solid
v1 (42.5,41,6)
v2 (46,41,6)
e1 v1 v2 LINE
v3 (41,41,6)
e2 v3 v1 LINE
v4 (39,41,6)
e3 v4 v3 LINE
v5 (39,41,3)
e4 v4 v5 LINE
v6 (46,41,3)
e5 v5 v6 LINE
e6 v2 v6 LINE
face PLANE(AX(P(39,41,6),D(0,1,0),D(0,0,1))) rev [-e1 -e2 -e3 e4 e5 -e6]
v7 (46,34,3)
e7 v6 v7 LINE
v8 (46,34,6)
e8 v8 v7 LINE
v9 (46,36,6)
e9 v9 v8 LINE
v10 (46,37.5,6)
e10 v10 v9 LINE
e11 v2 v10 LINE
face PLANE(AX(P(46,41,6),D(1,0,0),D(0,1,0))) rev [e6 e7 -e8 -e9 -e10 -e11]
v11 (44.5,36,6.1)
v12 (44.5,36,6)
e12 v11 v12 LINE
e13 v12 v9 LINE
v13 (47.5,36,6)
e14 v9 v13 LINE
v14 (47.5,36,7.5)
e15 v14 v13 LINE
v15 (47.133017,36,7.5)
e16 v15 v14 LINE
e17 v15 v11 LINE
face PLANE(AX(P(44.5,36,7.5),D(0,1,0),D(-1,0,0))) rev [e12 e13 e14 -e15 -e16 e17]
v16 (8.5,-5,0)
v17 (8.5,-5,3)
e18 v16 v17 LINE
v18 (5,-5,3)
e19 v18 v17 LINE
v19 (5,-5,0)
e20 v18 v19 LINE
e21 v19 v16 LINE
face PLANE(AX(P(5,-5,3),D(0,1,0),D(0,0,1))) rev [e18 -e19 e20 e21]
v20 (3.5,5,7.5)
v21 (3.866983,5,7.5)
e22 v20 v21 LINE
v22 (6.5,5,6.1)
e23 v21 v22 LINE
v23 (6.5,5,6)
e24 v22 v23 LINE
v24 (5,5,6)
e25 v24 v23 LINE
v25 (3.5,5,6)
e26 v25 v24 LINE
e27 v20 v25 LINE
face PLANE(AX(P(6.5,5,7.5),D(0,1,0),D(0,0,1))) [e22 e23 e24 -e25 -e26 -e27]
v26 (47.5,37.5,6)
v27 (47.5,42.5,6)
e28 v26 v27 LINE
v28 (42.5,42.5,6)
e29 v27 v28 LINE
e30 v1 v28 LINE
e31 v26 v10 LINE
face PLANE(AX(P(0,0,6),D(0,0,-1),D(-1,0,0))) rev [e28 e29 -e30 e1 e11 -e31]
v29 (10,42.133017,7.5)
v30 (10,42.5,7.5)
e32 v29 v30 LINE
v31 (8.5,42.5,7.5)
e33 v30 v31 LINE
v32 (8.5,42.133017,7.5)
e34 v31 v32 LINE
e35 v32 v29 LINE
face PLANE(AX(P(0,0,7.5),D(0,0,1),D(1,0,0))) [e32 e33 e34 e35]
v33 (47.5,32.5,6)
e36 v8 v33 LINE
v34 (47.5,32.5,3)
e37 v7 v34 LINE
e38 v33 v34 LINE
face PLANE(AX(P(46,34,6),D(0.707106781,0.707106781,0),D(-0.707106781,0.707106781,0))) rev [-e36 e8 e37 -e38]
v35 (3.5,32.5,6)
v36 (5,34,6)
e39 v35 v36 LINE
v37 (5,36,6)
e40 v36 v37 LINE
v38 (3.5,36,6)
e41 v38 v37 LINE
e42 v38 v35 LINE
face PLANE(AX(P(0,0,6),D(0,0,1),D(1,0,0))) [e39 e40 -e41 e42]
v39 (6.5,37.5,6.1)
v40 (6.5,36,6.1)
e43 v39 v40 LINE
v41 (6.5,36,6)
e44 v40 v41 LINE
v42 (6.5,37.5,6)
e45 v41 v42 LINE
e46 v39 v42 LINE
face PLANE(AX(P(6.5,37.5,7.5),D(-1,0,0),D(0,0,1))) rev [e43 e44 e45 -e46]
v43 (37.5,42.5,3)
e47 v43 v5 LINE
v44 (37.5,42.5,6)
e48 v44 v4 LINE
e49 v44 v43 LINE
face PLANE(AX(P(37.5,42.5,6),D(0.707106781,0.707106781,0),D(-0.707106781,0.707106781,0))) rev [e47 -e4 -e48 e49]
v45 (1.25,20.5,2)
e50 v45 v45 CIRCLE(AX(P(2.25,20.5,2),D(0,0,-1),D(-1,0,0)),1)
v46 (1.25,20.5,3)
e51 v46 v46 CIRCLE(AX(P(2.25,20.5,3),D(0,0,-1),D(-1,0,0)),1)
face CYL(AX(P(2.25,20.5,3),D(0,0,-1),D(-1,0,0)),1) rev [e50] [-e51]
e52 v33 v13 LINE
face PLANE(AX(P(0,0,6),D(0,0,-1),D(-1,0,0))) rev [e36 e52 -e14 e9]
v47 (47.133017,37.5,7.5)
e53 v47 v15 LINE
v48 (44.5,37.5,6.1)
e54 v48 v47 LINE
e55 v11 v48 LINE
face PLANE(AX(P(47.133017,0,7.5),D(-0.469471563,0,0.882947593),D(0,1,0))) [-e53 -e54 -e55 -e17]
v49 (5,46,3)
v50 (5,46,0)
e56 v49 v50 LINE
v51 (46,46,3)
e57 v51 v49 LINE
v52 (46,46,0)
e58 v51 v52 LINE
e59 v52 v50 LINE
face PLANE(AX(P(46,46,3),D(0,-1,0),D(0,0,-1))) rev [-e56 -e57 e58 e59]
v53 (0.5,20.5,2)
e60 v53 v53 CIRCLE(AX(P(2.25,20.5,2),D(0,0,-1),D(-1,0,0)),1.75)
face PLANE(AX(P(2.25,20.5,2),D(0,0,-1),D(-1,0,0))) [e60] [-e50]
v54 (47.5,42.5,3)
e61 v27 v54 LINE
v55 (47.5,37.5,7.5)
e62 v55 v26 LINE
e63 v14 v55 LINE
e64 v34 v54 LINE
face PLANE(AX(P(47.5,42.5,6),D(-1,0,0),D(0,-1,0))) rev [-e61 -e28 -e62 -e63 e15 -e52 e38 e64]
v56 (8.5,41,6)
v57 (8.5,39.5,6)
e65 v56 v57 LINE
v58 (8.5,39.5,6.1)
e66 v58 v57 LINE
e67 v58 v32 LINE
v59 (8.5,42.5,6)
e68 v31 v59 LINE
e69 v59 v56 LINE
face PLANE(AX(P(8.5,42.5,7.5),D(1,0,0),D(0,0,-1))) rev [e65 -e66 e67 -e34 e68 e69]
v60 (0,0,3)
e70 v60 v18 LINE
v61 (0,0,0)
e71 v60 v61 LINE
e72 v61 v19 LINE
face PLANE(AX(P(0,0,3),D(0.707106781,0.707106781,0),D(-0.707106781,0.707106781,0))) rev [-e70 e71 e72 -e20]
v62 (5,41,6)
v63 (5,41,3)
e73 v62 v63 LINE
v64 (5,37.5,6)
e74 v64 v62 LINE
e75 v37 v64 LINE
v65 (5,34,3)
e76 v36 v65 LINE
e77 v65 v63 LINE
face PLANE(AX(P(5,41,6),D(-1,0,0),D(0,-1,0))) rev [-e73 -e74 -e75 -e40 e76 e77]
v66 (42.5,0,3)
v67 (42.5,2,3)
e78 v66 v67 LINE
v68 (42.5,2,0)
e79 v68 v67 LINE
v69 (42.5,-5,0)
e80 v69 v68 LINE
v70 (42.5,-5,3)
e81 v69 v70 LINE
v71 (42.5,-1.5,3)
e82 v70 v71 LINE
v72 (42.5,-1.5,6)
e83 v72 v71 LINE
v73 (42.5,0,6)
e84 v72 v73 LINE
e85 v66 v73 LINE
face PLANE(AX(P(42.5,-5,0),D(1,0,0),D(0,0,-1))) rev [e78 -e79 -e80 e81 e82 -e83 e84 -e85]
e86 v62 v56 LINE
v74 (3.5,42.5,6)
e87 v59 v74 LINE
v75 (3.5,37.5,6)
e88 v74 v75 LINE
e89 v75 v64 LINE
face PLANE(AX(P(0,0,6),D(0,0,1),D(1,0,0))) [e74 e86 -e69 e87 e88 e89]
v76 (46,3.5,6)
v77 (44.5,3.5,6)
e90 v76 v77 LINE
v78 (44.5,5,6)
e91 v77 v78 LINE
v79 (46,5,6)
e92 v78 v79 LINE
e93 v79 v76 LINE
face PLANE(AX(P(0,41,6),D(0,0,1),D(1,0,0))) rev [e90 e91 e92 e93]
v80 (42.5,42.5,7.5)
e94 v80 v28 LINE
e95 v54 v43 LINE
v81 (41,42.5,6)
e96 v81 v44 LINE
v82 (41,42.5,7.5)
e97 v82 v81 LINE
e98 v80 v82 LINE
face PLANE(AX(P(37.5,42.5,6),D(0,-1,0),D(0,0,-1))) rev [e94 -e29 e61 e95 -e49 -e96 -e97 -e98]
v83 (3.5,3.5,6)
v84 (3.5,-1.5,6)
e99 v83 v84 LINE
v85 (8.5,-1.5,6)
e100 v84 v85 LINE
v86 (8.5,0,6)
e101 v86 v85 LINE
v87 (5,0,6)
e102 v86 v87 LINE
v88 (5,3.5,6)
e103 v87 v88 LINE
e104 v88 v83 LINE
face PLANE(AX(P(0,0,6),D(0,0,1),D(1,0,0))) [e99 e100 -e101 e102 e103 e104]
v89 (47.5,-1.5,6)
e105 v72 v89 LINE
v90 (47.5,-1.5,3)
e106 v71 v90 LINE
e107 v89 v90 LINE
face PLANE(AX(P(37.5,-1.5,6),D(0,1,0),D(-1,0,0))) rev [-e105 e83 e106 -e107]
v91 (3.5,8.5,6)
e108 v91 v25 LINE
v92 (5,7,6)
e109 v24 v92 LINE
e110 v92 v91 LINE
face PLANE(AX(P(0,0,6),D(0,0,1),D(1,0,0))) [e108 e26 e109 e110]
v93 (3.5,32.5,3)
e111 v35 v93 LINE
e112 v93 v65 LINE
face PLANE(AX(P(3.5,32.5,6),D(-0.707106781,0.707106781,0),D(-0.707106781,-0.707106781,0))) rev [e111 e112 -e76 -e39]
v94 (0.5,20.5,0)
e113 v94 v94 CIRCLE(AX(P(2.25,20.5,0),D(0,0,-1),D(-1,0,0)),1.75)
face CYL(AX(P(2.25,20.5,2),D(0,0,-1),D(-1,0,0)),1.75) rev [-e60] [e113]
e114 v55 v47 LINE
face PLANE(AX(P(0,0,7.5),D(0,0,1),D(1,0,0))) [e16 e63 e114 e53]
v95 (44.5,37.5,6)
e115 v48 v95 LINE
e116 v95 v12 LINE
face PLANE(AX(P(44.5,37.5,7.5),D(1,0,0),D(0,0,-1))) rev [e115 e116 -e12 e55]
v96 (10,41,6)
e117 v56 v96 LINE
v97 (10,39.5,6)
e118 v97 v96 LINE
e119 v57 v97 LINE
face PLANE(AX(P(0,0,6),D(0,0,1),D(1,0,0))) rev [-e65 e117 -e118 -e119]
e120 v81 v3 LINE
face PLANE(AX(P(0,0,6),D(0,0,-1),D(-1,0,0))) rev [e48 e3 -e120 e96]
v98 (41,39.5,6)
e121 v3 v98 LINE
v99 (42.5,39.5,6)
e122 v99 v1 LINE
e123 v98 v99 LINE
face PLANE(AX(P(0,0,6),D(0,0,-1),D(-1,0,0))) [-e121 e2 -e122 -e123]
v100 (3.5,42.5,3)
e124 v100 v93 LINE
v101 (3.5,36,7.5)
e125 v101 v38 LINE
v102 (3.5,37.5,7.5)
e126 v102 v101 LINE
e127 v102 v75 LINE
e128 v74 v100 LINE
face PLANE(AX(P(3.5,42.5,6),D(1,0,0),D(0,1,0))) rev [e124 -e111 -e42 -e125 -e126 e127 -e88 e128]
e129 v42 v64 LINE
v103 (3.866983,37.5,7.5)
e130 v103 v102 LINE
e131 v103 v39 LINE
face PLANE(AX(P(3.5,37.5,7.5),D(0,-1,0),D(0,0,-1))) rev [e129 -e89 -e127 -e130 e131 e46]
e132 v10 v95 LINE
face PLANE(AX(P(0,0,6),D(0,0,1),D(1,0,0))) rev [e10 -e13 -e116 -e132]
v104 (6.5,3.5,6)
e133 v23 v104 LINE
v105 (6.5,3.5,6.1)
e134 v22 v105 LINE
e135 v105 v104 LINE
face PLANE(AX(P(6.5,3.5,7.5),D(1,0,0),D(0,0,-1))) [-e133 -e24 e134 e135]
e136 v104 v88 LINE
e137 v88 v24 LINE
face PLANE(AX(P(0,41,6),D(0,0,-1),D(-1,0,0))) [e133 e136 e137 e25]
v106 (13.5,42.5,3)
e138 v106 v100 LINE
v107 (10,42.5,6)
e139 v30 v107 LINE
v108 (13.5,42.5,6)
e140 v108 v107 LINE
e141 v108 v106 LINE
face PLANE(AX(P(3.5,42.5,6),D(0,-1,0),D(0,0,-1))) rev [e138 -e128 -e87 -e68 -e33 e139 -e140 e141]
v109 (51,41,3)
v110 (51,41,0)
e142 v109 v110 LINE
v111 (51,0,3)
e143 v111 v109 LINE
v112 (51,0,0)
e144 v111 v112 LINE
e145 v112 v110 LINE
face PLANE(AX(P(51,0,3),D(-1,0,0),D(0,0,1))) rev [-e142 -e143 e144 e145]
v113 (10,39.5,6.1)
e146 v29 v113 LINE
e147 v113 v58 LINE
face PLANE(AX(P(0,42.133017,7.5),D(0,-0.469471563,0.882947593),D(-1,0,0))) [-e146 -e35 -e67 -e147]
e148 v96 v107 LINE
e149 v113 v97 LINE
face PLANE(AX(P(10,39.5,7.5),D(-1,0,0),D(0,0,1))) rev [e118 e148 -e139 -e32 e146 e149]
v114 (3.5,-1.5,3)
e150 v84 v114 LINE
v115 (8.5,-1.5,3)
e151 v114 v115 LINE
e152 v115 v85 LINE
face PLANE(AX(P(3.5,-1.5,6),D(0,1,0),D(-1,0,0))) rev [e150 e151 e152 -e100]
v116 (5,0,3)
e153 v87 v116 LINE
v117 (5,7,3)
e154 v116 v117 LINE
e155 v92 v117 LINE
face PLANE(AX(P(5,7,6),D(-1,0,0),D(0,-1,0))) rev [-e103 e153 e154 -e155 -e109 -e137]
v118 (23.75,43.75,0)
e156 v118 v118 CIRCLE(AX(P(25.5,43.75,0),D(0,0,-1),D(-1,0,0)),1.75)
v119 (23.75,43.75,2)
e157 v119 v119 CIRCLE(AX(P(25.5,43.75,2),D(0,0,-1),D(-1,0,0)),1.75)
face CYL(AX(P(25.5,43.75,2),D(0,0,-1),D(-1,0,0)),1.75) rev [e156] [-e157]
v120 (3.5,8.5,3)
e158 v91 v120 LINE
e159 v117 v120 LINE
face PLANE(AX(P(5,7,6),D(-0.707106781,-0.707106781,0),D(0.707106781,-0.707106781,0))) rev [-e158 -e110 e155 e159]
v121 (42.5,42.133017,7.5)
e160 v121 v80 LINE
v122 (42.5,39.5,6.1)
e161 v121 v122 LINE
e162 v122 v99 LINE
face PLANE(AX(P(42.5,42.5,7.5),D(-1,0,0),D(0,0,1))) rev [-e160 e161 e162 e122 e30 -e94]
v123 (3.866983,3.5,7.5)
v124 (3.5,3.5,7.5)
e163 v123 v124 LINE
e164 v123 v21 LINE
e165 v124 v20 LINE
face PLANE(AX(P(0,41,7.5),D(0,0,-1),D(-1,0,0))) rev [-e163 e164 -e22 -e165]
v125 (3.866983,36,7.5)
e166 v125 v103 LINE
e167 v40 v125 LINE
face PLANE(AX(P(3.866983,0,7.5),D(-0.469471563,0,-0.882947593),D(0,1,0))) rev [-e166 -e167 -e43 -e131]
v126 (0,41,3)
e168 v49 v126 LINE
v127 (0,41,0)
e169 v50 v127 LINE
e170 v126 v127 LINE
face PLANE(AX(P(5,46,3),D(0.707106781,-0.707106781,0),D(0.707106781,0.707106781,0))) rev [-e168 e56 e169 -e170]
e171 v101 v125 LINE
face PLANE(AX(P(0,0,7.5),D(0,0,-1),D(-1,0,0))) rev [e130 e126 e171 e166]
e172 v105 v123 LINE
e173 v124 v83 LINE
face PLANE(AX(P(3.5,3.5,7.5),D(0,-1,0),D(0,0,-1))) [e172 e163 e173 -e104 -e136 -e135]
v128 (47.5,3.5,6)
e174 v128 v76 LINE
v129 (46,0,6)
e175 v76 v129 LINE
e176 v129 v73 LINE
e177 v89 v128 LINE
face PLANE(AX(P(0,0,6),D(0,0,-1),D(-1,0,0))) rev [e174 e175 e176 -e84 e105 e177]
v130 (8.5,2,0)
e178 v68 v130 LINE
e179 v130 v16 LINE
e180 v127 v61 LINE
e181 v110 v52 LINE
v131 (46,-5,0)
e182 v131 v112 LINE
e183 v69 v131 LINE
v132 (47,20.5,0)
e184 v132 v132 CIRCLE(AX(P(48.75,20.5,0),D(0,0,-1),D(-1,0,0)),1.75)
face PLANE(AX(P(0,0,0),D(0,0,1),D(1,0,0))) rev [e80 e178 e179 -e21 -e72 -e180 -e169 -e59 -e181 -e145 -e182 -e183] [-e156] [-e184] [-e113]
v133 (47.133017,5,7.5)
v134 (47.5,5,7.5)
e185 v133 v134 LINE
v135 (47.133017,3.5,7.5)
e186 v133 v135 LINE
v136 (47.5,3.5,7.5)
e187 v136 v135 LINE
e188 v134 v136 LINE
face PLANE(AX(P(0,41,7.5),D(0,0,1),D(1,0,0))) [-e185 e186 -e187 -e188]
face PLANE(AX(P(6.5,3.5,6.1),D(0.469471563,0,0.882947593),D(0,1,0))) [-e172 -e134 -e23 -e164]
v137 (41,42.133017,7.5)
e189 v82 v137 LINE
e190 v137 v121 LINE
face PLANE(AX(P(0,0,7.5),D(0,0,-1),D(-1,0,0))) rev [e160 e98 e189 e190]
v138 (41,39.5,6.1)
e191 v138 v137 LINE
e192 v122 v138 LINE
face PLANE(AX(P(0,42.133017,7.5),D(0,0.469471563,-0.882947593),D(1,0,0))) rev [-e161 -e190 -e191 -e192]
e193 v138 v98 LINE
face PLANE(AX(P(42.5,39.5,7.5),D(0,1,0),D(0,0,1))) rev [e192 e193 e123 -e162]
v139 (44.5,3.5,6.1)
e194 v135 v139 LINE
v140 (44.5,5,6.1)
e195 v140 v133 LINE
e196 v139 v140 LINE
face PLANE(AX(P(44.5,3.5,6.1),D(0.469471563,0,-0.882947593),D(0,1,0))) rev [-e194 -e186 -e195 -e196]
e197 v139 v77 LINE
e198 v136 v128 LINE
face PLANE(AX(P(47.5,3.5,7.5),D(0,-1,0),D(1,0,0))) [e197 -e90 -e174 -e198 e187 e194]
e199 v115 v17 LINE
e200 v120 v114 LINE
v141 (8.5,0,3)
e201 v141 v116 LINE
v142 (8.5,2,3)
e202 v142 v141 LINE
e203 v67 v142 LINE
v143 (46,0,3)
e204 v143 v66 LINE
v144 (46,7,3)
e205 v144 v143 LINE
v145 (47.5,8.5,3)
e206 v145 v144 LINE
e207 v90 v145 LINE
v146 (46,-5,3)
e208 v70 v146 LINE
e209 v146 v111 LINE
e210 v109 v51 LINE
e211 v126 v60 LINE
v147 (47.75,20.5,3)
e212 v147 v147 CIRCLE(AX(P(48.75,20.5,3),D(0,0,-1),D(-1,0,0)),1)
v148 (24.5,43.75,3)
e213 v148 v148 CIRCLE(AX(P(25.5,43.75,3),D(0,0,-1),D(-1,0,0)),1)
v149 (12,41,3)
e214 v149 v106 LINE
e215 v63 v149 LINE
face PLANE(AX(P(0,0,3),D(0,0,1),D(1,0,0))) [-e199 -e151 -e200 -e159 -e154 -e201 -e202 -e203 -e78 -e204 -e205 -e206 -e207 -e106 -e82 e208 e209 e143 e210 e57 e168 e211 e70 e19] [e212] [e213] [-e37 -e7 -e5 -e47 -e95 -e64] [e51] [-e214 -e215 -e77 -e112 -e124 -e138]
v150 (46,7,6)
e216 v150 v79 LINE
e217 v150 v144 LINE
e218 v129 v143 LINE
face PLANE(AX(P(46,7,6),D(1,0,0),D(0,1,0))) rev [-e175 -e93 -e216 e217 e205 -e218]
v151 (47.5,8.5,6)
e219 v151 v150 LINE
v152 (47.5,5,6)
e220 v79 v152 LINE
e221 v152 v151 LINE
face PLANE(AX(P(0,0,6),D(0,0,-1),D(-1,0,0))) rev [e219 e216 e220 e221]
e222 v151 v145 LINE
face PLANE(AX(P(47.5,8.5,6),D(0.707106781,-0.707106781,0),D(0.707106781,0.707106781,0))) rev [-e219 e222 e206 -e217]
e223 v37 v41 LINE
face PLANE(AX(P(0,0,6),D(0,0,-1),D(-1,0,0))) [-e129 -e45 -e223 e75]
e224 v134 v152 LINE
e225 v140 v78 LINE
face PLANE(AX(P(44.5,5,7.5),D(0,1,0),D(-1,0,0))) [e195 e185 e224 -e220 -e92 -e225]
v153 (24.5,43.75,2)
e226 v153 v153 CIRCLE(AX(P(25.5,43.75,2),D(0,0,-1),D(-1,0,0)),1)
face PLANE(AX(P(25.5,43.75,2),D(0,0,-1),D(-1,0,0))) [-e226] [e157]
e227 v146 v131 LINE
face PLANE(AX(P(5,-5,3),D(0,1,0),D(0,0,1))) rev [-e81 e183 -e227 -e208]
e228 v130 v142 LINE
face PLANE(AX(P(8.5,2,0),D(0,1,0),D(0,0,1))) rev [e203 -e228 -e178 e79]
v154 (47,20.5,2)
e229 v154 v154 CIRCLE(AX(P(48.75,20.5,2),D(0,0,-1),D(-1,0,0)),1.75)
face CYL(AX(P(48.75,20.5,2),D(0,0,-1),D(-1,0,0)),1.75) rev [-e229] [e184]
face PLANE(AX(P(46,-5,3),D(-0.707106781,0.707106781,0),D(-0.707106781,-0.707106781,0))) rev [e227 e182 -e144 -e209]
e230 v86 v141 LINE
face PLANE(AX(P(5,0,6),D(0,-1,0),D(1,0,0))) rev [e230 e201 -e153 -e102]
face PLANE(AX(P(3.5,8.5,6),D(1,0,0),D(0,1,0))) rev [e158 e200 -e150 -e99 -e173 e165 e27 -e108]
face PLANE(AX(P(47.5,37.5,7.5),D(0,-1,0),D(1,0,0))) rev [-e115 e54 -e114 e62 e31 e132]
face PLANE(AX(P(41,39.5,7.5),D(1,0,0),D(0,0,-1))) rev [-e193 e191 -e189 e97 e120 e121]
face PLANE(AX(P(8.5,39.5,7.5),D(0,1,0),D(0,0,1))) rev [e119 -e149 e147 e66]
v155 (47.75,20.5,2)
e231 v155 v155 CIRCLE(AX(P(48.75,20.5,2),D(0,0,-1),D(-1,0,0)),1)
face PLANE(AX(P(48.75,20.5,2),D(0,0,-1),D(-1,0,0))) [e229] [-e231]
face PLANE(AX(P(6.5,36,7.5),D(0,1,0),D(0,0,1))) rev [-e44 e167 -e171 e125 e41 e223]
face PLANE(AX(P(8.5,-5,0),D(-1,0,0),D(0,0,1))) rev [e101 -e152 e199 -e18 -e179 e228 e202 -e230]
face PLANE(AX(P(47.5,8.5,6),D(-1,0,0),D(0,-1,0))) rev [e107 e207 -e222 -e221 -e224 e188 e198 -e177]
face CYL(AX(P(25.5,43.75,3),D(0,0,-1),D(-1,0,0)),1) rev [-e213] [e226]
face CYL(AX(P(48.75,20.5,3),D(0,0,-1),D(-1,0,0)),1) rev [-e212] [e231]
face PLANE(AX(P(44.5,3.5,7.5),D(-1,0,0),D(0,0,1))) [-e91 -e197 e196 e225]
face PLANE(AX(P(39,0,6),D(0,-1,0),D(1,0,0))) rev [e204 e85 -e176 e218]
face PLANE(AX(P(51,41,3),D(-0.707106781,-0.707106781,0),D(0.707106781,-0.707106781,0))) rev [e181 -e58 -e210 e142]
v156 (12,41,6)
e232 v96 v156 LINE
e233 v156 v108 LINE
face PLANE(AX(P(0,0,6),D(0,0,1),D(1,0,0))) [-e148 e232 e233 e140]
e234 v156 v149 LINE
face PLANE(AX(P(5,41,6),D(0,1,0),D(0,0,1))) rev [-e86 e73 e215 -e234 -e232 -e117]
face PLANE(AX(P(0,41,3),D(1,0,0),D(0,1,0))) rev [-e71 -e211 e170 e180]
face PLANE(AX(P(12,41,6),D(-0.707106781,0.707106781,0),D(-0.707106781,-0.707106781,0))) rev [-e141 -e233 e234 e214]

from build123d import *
from OCP.BRepFilletAPI import BRepFilletAPI_MakeChamfer

# Parameters (mm, degrees)
BOSS_EXTRU_1_DEPTH           = 3
BOSS_EXTRU_2_DEPTH           = 3
ENL_V_MAT_EXTRU_1_DEPTH      = 69.745908969
ENL_V_MAT_EXTRU_1_DEPTH_BACK = 69.745908969
ESQUISSE3_W                  = 34
ESQUISSE3_H                  = 7
ESQUISSE4_R                  = 1.75
ENL_V_MAT_EXTRU_2_DEPTH      = 2
ESQUISSE5_R                  = 1
ENL_V_MAT_EXTRU_3_DEPTH      = 1
ESQUISSE6_W                  = 1.5
ESQUISSE6_H                  = 3
ESQUISSE6_W_2                = 3
ESQUISSE6_H_2                = 1.5
BOSS_EXTRU_3_DEPTH           = 1.5
CHANFREIN1_SIZE              = 1.4
CHANFREIN1_SIZE2             = 2.633017051
SYM_TRIE1_START              = 3.5
SYM_TRIE1_DEPTH              = 1.5


# Read off the part's stored shape, not the designer's step: Symétrie1
with BuildPart() as part:
    # Esquisse1 → Boss.-Extru.1 (new body)
    with BuildSketch(Plane.XY):
        Polygon((0, 0), (5, -5), (46, -5), (51, 0), (51, 41), (46, 46), (5, 46), (0, 41), align=None)
    extrude(amount=BOSS_EXTRU_1_DEPTH)

    # Esquisse2 → Boss.-Extru.2 (add)
    with BuildSketch(Plane.XY.offset(3)):
        Polygon((5, 41), (5, 34), (3.5, 32.5), (3.5, 42.5), (13.5, 42.5), (12, 41), align=None)
        Polygon((3.5, -1.5), (13.5, -1.5), (12, 0), (5, 0), (5, 7), (3.5, 8.5), align=None)
        Polygon((47.5, 42.5), (47.5, 32.5), (46, 34), (46, 41), (39, 41), (37.5, 42.5), align=None)
        Polygon((46, 7), (46, 0), (39, 0), (37.5, -1.5), (47.5, -1.5), (47.5, 8.5), align=None)
    extrude(amount=BOSS_EXTRU_2_DEPTH)

    # Esquisse3 → Enlèv. mat.-Extru.1 (cut, two sides: drawn at the far end of the back side and taken through both)
    with BuildSketch(Plane.XY.offset(3).offset(-ENL_V_MAT_EXTRU_1_DEPTH_BACK)):
        with Locations((25.5, -1.5)):
            Rectangle(ESQUISSE3_W, ESQUISSE3_H)
    extrude(amount=ENL_V_MAT_EXTRU_1_DEPTH + ENL_V_MAT_EXTRU_1_DEPTH_BACK, mode=Mode.SUBTRACT)

    # Esquisse4 → Enlèv. mat.-Extru.2 (cut)
    with BuildSketch(Plane(origin=(0, 0, 0), x_dir=(-1, 0, 0), z_dir=(0, 0, -1))):
        with Locations((-25.5, 43.75)):
            Circle(ESQUISSE4_R)
        with Locations((-48.75, 20.5)):
            Circle(ESQUISSE4_R)
        with Locations((-2.25, 20.5)):
            Circle(ESQUISSE4_R)
    extrude(amount=-ENL_V_MAT_EXTRU_2_DEPTH, mode=Mode.SUBTRACT)

    # Esquisse5 → Enlèv. mat.-Extru.3 (cut)
    with BuildSketch(Plane(origin=(0, 0, 2), x_dir=(-1, 0, 0), z_dir=(0, 0, -1))):
        with Locations((-25.5, 43.75)):
            Circle(ESQUISSE5_R)
        with Locations((-2.25, 20.5)):
            Circle(ESQUISSE5_R)
        with Locations((-48.75, 20.5)):
            Circle(ESQUISSE5_R)
    extrude(amount=-ENL_V_MAT_EXTRU_3_DEPTH, mode=Mode.SUBTRACT)

    # Esquisse6 → Boss.-Extru.3 (add)
    with BuildSketch(Plane.XY.offset(6)):
        with Locations((9.25, 41)):
            Rectangle(ESQUISSE6_W, ESQUISSE6_H)
        with Locations((41.75, 41)):
            Rectangle(ESQUISSE6_W, ESQUISSE6_H)
        with Locations((5, 36.75)):
            Rectangle(ESQUISSE6_W_2, ESQUISSE6_H_2)
        with Locations((46, 36.75)):
            Rectangle(ESQUISSE6_W_2, ESQUISSE6_H_2)
    extrude(amount=BOSS_EXTRU_3_DEPTH)

    # Chanfrein1: one chamfer whose edges measure the first distance from different faces: ONE call of the kernel's chamfer builder (chamfer() names one face for all edges)
    chanfrein1_edges_1 = [part.edges().sort_by_distance(p)[0] for p in [
        (9.25, 39.5, 7.5),
    ]]
    chanfrein1_side_1 = [part.faces().sort_by_distance(p)[0] for p in [
        (9.25, 39.5, 6.75),
    ]]
    chanfrein1_edges_2 = [part.edges().sort_by_distance(p)[0] for p in [
        (41.75, 39.5, 7.5),
    ]]
    chanfrein1_side_2 = [part.faces().sort_by_distance(p)[0] for p in [
        (41.75, 39.5, 6.75),
    ]]
    chanfrein1_edges_3 = [part.edges().sort_by_distance(p)[0] for p in [
        (6.5, 36.75, 7.5),
    ]]
    chanfrein1_side_3 = [part.faces().sort_by_distance(p)[0] for p in [
        (6.5, 36.75, 6.75),
    ]]
    chanfrein1_edges_4 = [part.edges().sort_by_distance(p)[0] for p in [
        (44.5, 36.75, 7.5),
    ]]
    chanfrein1_side_4 = [part.faces().sort_by_distance(p)[0] for p in [
        (44.5, 36.75, 6.75),
    ]]
    chanfrein1 = BRepFilletAPI_MakeChamfer(part.part.solid().wrapped)
    for e in chanfrein1_edges_1:
        chanfrein1.Add(CHANFREIN1_SIZE, CHANFREIN1_SIZE2, e.wrapped, chanfrein1_side_1[0].wrapped)  # the first distance lies on this face
    for e in chanfrein1_edges_2:
        chanfrein1.Add(CHANFREIN1_SIZE, CHANFREIN1_SIZE2, e.wrapped, chanfrein1_side_2[0].wrapped)  # the first distance lies on this face
    for e in chanfrein1_edges_3:
        chanfrein1.Add(CHANFREIN1_SIZE, CHANFREIN1_SIZE2, e.wrapped, chanfrein1_side_3[0].wrapped)  # the first distance lies on this face
    for e in chanfrein1_edges_4:
        chanfrein1.Add(CHANFREIN1_SIZE, CHANFREIN1_SIZE2, e.wrapped, chanfrein1_side_4[0].wrapped)  # the first distance lies on this face
    add(Compound.cast(chanfrein1.Shape()), mode=Mode.REPLACE)

    # Symétrie1 outline → Symétrie1 (add)
    with BuildSketch(Plane(origin=(0, 0, 0), x_dir=(1, 0, 0), z_dir=(0, 1, 0)).offset(SYM_TRIE1_START)):
        Polygon((3.5, -6), (3.5, -7.5), (3.866982949, -7.5), (6.5, -6.1), (6.5, -6), align=None)
        Polygon((47.5, -6), (44.5, -6), (44.5, -6.1), (47.133017051, -7.5), (47.5, -7.5), align=None)
    extrude(amount=SYM_TRIE1_DEPTH)


solid = part.part
